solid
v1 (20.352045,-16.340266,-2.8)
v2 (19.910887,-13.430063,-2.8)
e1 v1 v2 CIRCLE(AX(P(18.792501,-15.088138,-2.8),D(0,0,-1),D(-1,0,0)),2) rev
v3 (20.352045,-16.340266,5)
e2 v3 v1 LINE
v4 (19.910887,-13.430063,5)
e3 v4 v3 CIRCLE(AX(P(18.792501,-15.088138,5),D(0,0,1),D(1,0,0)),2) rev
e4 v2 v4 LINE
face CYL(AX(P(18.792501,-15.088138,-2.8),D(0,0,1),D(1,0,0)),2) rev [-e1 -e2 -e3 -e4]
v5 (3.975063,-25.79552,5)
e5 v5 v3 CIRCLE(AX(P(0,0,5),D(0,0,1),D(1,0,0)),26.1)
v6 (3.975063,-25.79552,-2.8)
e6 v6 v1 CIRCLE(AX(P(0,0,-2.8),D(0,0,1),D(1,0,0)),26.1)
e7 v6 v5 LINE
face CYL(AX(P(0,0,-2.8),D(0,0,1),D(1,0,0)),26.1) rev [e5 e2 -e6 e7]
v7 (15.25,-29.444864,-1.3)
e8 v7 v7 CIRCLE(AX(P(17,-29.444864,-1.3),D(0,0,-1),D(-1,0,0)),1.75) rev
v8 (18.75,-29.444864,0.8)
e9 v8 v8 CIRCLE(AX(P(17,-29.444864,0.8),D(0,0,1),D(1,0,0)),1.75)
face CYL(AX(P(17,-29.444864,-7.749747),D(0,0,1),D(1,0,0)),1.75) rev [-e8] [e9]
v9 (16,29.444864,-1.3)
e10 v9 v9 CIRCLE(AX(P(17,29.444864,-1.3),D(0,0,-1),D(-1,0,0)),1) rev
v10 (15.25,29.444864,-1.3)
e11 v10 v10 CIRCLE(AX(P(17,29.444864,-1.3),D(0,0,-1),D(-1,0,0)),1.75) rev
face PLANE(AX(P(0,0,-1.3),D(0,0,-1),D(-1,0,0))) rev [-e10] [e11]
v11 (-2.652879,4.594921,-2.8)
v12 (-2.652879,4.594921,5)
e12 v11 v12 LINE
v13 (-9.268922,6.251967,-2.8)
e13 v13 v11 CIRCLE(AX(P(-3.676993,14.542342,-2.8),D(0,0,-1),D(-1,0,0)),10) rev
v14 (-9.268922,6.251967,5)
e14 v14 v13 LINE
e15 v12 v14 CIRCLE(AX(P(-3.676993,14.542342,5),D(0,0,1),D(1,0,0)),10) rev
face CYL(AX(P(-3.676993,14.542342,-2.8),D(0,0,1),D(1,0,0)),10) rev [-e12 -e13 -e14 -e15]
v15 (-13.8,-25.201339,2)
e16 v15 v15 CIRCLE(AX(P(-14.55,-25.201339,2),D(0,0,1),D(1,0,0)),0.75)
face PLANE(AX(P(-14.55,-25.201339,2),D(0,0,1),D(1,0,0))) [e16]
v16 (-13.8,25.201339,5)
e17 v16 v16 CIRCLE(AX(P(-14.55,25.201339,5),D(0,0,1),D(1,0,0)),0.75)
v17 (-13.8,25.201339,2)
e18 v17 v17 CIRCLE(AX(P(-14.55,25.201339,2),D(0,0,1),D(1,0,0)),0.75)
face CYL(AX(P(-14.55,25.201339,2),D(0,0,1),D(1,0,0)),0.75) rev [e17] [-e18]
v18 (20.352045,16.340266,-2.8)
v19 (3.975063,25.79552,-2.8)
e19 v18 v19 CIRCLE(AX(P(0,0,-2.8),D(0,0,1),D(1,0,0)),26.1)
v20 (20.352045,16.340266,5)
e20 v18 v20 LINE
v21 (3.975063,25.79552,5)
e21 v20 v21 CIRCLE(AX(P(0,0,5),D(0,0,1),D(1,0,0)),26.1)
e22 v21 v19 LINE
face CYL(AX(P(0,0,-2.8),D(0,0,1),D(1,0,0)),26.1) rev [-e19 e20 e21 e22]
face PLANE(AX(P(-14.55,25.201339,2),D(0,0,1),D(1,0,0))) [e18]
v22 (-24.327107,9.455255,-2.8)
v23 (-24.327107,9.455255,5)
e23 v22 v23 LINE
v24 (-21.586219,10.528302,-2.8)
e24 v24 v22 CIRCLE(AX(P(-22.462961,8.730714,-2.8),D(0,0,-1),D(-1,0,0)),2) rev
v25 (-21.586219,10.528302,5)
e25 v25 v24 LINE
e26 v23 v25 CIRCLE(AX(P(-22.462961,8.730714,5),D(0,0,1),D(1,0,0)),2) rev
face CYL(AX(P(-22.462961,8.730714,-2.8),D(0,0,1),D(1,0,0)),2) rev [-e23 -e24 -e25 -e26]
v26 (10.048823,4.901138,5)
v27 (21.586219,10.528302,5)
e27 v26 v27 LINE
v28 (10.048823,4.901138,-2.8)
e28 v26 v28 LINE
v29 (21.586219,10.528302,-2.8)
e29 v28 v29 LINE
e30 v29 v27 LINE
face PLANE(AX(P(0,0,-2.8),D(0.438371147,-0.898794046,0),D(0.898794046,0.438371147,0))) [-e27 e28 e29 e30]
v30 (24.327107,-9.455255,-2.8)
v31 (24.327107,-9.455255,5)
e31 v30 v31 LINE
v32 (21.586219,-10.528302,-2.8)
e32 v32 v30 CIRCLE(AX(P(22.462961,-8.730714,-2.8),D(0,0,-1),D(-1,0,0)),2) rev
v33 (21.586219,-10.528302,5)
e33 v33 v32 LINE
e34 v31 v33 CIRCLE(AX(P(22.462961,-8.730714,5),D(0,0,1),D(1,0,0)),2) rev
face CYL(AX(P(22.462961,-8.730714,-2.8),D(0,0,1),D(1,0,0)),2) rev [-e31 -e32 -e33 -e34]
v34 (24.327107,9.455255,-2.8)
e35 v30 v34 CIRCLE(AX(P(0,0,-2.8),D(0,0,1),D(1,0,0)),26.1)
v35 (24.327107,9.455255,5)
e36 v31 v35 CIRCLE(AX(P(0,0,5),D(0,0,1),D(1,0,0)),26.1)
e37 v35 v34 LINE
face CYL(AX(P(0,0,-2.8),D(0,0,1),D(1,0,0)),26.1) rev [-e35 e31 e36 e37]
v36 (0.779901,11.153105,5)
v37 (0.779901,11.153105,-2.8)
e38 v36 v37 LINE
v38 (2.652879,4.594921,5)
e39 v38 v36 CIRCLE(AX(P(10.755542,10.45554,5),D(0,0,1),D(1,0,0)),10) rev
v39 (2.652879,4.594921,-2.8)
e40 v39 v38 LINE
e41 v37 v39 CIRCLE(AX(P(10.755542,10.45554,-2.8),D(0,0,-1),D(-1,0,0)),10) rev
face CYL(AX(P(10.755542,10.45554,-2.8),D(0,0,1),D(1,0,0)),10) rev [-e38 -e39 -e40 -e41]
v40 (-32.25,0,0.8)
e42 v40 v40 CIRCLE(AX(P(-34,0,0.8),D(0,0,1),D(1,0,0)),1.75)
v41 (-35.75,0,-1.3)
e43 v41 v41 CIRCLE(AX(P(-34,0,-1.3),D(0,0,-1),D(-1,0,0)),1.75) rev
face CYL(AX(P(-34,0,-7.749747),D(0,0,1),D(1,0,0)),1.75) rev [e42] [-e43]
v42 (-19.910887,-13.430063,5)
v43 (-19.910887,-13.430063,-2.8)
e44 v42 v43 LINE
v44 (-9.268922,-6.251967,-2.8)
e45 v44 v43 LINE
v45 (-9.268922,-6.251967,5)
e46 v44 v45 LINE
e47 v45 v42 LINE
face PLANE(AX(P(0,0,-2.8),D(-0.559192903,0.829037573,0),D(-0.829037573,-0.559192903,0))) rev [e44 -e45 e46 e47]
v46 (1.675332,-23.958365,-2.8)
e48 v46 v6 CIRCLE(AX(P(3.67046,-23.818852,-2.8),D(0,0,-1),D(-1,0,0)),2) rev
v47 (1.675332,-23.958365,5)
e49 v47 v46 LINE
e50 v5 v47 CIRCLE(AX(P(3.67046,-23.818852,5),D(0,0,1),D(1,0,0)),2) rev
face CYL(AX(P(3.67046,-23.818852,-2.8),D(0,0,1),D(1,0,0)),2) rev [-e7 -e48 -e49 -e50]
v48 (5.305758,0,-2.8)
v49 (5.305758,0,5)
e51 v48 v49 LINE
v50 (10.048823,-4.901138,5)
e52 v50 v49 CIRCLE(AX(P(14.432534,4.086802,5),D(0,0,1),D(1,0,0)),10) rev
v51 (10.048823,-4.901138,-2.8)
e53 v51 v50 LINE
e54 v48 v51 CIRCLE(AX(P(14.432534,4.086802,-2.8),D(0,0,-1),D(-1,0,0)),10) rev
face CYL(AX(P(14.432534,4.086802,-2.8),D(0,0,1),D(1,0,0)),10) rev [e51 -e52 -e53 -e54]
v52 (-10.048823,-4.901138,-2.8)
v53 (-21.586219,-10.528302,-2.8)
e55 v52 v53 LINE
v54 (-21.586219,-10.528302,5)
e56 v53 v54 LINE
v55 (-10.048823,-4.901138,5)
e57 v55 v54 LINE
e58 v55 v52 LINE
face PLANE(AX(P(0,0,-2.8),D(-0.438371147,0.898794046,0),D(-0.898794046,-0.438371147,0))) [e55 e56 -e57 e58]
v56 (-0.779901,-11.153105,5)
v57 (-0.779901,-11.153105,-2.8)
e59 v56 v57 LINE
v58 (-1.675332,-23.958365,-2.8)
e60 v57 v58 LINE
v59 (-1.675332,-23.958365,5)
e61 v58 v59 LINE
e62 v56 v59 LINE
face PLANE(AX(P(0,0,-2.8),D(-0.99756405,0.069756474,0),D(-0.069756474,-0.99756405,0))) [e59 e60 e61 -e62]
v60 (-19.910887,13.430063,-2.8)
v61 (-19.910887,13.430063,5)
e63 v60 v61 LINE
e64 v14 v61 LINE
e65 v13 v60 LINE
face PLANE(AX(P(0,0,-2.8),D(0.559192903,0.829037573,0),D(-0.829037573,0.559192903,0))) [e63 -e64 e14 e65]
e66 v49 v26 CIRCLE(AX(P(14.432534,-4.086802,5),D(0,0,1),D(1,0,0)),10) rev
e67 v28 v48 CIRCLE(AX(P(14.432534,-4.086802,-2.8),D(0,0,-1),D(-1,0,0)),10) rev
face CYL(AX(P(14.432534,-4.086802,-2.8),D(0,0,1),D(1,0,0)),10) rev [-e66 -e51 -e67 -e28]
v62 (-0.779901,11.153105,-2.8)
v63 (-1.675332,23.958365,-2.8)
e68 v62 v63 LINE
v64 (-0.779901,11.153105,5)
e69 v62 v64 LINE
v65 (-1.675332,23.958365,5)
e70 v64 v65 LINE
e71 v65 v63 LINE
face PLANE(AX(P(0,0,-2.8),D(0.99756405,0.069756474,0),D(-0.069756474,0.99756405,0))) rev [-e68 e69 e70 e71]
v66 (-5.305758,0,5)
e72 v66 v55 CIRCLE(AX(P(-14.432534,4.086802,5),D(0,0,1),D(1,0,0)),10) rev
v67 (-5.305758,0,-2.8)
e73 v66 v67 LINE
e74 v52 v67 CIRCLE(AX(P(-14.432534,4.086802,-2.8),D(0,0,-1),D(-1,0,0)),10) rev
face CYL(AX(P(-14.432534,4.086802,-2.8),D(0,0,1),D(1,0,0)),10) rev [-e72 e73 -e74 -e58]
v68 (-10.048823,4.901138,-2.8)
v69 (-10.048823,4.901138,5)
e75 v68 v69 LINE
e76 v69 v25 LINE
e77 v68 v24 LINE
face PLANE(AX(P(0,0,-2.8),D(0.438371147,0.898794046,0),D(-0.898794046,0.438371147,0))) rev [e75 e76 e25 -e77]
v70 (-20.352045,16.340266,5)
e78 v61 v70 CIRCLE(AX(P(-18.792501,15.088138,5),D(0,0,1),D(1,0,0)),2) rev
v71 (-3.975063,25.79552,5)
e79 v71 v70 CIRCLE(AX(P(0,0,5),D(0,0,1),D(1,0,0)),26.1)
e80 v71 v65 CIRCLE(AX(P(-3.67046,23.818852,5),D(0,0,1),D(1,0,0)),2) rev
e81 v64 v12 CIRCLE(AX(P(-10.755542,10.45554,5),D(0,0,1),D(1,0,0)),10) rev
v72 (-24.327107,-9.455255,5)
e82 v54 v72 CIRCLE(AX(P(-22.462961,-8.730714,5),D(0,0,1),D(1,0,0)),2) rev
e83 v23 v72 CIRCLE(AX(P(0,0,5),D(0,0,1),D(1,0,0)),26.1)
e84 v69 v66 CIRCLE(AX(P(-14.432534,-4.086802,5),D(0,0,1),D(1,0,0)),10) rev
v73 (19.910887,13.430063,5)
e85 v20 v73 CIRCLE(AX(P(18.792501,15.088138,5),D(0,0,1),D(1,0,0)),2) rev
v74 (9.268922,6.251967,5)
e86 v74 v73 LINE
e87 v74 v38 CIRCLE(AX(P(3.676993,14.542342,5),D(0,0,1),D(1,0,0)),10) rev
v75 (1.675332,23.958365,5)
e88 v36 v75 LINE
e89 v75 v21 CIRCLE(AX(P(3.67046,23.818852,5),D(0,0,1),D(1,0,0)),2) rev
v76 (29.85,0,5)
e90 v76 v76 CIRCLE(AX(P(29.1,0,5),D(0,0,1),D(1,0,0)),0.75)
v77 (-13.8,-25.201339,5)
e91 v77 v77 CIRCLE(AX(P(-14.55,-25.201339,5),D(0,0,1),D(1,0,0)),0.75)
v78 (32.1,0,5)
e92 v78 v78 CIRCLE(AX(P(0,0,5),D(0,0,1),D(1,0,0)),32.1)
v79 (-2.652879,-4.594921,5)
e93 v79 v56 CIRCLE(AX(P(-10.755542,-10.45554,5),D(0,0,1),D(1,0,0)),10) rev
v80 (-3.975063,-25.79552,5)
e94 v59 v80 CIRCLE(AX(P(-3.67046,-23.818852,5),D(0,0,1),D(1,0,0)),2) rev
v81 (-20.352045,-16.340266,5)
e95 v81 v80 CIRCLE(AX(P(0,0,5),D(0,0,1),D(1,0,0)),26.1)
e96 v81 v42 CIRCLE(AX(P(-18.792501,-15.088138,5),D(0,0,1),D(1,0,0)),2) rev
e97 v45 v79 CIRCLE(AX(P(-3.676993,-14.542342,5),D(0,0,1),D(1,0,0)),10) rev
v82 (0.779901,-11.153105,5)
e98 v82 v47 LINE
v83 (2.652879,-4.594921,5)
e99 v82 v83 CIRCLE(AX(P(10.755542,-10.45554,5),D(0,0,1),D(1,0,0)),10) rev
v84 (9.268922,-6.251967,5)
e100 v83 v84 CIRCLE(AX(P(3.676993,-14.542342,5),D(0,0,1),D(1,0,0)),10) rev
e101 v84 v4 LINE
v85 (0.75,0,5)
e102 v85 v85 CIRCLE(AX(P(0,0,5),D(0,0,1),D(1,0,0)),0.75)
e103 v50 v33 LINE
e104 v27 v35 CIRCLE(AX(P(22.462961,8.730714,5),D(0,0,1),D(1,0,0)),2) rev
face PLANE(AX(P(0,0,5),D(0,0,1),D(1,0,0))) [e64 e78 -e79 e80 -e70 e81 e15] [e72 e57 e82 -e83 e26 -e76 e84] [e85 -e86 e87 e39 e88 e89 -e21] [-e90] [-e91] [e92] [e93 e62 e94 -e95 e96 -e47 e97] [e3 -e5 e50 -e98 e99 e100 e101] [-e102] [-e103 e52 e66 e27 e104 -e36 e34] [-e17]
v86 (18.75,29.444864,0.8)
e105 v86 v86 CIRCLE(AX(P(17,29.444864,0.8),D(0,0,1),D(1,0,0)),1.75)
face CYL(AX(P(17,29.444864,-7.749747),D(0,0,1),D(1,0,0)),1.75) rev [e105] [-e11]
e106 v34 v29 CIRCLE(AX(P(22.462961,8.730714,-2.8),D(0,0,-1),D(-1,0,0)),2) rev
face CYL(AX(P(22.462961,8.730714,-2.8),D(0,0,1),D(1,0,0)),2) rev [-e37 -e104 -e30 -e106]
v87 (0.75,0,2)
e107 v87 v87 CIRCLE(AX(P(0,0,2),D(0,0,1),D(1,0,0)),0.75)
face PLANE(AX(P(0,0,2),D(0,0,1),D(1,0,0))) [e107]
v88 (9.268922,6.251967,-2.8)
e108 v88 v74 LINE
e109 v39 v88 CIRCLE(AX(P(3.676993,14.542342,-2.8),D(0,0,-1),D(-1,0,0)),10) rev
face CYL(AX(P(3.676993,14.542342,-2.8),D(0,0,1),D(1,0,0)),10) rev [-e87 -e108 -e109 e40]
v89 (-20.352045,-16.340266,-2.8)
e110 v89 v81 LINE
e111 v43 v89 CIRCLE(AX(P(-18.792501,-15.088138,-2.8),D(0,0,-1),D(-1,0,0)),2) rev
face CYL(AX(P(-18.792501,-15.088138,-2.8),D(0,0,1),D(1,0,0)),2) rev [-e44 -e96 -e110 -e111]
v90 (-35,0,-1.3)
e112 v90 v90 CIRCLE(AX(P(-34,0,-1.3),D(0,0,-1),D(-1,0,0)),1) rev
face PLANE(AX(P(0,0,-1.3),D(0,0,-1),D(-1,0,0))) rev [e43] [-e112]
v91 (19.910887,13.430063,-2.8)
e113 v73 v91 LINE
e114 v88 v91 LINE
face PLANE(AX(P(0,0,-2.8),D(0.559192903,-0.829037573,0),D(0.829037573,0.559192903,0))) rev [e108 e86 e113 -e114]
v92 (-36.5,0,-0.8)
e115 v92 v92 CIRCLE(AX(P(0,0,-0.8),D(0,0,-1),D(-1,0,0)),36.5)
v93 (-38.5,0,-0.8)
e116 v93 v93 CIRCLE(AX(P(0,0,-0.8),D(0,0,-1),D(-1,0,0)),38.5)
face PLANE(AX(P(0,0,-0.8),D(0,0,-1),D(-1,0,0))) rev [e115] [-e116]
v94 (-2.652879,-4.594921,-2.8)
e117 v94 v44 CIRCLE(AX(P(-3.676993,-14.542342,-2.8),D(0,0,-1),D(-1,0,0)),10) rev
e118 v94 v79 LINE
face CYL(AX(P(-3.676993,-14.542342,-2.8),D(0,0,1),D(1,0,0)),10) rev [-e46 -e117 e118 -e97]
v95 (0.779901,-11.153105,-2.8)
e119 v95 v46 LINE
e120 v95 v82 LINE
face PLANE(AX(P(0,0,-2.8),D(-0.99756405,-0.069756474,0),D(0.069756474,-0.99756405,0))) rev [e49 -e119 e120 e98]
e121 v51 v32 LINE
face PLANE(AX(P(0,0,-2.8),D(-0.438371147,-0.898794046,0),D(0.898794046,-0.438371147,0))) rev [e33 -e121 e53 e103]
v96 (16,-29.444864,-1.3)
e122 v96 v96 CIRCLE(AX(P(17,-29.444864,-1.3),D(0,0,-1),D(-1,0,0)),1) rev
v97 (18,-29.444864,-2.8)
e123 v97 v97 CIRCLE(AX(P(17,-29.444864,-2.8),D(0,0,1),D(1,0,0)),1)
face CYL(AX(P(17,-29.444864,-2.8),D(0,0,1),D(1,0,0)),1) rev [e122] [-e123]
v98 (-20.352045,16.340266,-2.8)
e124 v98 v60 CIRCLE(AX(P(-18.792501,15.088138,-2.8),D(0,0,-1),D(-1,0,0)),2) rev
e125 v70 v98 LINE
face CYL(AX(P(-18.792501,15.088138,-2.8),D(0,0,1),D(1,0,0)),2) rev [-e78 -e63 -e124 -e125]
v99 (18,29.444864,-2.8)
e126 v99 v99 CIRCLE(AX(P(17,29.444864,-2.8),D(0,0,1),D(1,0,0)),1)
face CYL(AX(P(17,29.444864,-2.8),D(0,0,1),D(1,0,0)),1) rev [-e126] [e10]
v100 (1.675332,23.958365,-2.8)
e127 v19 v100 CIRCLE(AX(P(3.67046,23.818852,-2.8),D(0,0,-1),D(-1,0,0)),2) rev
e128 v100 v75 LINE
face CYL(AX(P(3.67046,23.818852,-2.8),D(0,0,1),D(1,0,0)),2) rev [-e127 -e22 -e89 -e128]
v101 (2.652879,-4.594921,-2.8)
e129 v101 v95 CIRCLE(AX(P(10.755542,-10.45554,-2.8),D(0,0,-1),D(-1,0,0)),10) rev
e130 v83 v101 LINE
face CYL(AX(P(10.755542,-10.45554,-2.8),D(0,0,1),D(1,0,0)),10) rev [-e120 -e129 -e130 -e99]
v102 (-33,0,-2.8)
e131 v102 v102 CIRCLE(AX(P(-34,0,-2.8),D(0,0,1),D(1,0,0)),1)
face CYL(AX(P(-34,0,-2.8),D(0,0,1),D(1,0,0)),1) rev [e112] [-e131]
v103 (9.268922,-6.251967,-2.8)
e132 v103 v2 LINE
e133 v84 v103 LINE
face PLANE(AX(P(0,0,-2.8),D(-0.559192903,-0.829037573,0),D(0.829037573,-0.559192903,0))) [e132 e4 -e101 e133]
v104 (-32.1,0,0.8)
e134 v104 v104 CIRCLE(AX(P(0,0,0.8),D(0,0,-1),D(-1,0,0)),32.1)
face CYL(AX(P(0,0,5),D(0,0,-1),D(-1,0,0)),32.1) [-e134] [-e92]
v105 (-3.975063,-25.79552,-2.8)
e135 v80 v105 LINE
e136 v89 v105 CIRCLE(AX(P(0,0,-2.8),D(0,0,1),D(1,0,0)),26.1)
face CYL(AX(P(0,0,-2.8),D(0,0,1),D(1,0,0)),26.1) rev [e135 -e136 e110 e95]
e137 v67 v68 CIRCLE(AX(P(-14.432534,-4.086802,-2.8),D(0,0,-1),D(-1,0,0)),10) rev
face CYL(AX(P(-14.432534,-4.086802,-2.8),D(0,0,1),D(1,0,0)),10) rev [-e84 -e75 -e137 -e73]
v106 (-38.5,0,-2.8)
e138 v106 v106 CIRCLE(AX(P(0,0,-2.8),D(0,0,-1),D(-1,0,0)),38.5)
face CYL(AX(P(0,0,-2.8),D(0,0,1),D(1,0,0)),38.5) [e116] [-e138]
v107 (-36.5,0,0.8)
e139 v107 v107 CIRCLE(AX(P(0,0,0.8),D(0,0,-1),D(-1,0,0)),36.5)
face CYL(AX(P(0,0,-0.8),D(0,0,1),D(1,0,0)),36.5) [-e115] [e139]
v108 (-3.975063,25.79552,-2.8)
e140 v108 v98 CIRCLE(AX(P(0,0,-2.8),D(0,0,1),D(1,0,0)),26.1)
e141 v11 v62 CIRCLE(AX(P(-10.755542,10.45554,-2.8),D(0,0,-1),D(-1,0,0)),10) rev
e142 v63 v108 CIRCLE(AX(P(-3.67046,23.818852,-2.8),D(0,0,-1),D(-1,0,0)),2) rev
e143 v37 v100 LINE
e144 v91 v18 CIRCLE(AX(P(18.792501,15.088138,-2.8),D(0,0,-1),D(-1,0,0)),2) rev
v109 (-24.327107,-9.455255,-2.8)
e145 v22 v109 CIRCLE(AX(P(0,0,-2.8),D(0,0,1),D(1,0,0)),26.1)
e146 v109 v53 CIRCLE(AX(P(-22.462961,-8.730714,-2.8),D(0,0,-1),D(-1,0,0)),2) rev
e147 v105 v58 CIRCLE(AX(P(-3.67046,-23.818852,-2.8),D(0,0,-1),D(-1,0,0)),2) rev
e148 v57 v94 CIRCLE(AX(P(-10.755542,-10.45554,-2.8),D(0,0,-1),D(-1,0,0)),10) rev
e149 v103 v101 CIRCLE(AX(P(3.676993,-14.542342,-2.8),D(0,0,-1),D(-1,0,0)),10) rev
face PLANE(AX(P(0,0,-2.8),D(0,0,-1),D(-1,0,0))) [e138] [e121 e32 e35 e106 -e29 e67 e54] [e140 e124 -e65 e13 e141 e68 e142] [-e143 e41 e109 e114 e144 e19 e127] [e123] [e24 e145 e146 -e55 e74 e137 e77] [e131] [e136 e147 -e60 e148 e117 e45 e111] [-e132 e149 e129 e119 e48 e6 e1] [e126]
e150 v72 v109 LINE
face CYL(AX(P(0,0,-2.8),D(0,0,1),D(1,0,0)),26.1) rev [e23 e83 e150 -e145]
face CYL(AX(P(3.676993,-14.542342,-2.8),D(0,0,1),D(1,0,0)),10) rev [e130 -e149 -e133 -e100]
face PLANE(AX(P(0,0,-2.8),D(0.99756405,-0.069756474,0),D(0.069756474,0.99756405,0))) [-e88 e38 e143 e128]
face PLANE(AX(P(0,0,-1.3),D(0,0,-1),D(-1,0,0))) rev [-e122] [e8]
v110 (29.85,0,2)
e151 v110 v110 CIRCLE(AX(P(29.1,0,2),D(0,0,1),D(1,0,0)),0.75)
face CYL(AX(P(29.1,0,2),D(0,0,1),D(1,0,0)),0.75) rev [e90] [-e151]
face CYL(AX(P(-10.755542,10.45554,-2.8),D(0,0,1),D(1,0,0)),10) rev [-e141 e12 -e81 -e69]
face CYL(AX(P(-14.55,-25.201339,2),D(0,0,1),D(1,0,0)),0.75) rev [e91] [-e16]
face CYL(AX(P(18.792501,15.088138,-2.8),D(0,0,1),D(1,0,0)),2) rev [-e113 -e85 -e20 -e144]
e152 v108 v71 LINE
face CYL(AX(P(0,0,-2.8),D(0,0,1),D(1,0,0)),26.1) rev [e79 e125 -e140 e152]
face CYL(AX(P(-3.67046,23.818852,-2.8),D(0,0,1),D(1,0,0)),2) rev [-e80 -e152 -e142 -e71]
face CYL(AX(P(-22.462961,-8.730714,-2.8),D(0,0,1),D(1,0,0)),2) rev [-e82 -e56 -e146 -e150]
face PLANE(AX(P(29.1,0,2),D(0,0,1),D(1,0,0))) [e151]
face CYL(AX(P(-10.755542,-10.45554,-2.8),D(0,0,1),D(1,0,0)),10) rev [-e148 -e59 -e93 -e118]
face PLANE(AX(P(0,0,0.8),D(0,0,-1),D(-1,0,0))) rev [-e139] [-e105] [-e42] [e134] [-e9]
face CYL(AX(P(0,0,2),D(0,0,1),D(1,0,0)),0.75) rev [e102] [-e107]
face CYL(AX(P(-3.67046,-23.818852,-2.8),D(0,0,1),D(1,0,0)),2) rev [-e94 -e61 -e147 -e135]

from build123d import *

# Parameters (mm, degrees)
SKETCH_1_R                       = 32.1
EXTRUDE_1_DEPTH                  = 5
EXTRUDE_START                    = 0.8
SKETCH_2_R                       = 36.5
EXTRUDE_2_DEPTH                  = 1.6
SKETCH_3_R                       = 38.5
EXTRUDE_3_DEPTH                  = 2
SKETCH_4_R                       = 26.1
CUT_EXTRUDE_1_DEPTH              = 56.003090822
SKETCH_4_3_R                     = 5
EXTRUDE_4_DEPTH                  = 7.8
EXTRUDE_5_DEPTH                  = 7.8
FILLET_6_R                       = 2
PATTERN_CIRCULAR_2_COUNT         = 6
FILLET_6_OF_PATTERN_CIRCULAR_2_R = 2
FILLET_7_R                       = 10
SKETCH_6_R                       = 0.75
CUT_EXTRUDE_2_DEPTH              = 3
SKETCH_8_R                       = 1
CUT_EXTRUDE_4_DEPTH              = 55.608973622
SKETCH_8_3_R                     = 1.75
CUT_EXTRUDE_5_DEPTH              = 2.1


with BuildPart() as part:
    # 草图1 → 凸台-拉伸1 (new body)
    with BuildSketch(Plane.XY):
        Circle(SKETCH_1_R)
    extrude(amount=EXTRUDE_1_DEPTH)

    # 草图2 → 凸台-拉伸2 (add)
    with BuildSketch(Plane(origin=(0, 0, 0), x_dir=(-1, 0, 0), z_dir=(0, 0, -1)).offset(EXTRUDE_START)):
        Circle(SKETCH_2_R)
    extrude(amount=-EXTRUDE_2_DEPTH)

    # 草图3 → 凸台-拉伸3 (add)
    with BuildSketch(Plane(origin=(0, 0, -0.8), x_dir=(-1, 0, 0), z_dir=(0, 0, -1))):
        Circle(SKETCH_3_R)
    extrude(amount=EXTRUDE_3_DEPTH)

    # 草图4 → 切除-拉伸1 (cut, through all)
    with BuildSketch(Plane.XY.offset(5)):
        Circle(SKETCH_4_R)
    extrude(amount=-CUT_EXTRUDE_1_DEPTH, mode=Mode.SUBTRACT)



with BuildPart() as body_2:
    # 草图4<3> → 凸台-拉伸4 (new, through all)
    with BuildSketch(Plane.XY.offset(5)):
        Circle(SKETCH_4_3_R)
    extrude(amount=-EXTRUDE_4_DEPTH)


with BuildPart() as part_1:
    add(part.part)

    add(body_2.part)  # 凸台-拉伸5 merges body 2
    # 草图4<4> → 凸台-拉伸5 (add, through all)
    with BuildSketch(Plane.XY.offset(5)):
        with BuildLine():
            Line((-1.820643965, 26.036421712), (-0.348782369, 4.987820251))
            ThreePointArc((-0.348782369, 4.987820251), (0, 5), (0.348782369, 4.987820251))
            Line((0.348782369, 4.987820251), (1.820643965, 26.036421712))
            ThreePointArc((1.820643965, 26.036421712), (0, 26.1), (-1.820643965, 26.036421712))
        make_face()
    extrude_5 = extrude(amount=-EXTRUDE_5_DEPTH)

    # 圆角6
    fillet_6_edges = [part_1.edges().sort_by_distance(p)[0] for p in [
        (1.820643965, 26.036421712, 1.1),
        (-1.820643965, 26.036421712, 1.1),
    ]]
    fillet(fillet_6_edges, radius=FILLET_6_R)

    # 阵列(圆周)2: 凸台-拉伸5 ×6 about axis
    pattern_circular_2_axis = Axis((0, 0, 0), (0, 0, 1))
    for i in range(1, PATTERN_CIRCULAR_2_COUNT):
        add(extrude_5.rotate(pattern_circular_2_axis, i * 360 / PATTERN_CIRCULAR_2_COUNT))

    # 圆角6 of 阵列(圆周)2
    fillet_6_of_pattern_circular_2_edges = [part_1.edges().sort_by_distance(p)[0] for p in [
        (-21.637880644, 14.594934781, 1.1),
        (-23.458524608, 11.441486931, 1.1),
        (-23.458524608, -11.441486931, 1.1),
        (-21.637880644, -14.594934781, 1.1),
        (-1.820643965, -26.036421712, 1.1),
        (1.820643965, -26.036421712, 1.1),
        (21.637880644, -14.594934781, 1.1),
        (23.458524608, -11.441486931, 1.1),
        (23.458524608, 11.441486931, 1.1),
        (21.637880644, 14.594934781, 1.1),
    ]]
    fillet(fillet_6_of_pattern_circular_2_edges, radius=FILLET_6_OF_PATTERN_CIRCULAR_2_R)

    # 圆角7
    # the kernel refuses this fillet: 10 mm, written as the material it adds along each edge
    with BuildSketch(Plane(origin=(-4.493970231, -2.191855734, 5), x_dir=(-0.8987940462991628, -0.4383711467890857, 0), z_dir=(0, 0, -1)), Plane(origin=(-0.348782369, -4.987820251, 5), x_dir=(-0.06975647374411581, -0.9975640502598249, 0), z_dir=(0, 0, -1)), Plane(origin=(4.145187863, -2.795964517, 5), x_dir=(0.8290375725550467, -0.5591929034707394, 0), z_dir=(0, 0, -1)), Plane(origin=(4.493970231, 2.191855734, 5), x_dir=(0.8987940462991627, 0.43837114678908606, 0), z_dir=(0, 0, -1)), Plane(origin=(0.348782369, 4.987820251, 5), x_dir=(0.0697564737441158, 0.9975640502598249, 0), z_dir=(0, 0, -1)), Plane(origin=(-4.145187863, 2.795964517, 5), x_dir=(-0.8290375725550471, 0.5591929034707388, 0), z_dir=(0, 0, -1))) as fillet_7_piece_1:
        with BuildLine():
            CenterArc((6.180339887, 10), FILLET_7_R, 221.810314896, 48.189685104)
            ThreePointArc((-1.273220038, 3.333333333), (-0.329138205, 1.784110449), (0, 0))
            Line((0, 0), (6.180339887, 0))
        make_face()
    extrude(amount=7.8)
    with BuildSketch(Plane(origin=(-4.145187863, -2.795964517, 5), x_dir=(-0.8290375725550488, -0.5591929034707364, 0), z_dir=(0, 0, -1)), Plane(origin=(0.348782369, -4.987820251, 5), x_dir=(0.06975647374411298, -0.9975640502598251, 0), z_dir=(0, 0, -1)), Plane(origin=(4.493970231, -2.191855734, 5), x_dir=(0.8987940462991613, -0.4383711467890891, 0), z_dir=(0, 0, -1)), Plane(origin=(4.145187863, 2.795964517, 5), x_dir=(0.8290375725550484, 0.5591929034707368, 0), z_dir=(0, 0, -1)), Plane(origin=(-0.348782369, 4.987820251, 5), x_dir=(-0.0697564737441132, 0.9975640502598251, 0), z_dir=(0, 0, -1)), Plane(origin=(-4.493970231, 2.191855734, 5), x_dir=(-0.8987940462991615, 0.43837114678908873, 0), z_dir=(0, 0, -1))) as fillet_7_piece_2:
        with BuildLine():
            CenterArc((6.180339887, -10), FILLET_7_R, 90, 48.189685104)
            ThreePointArc((-1.273220038, -3.333333333), (-0.329138205, -1.784110449), (0, 0))
            Line((0, 0), (6.180339887, 0))
        make_face()
    extrude(amount=7.8)

    # 草图6 → 切除-拉伸2 (cut)
    with BuildSketch(Plane.XY.offset(5)):
        Circle(SKETCH_6_R)
        with Locations((-14.55, 25.20133925)):
            Circle(SKETCH_6_R)
        with Locations((29.1, 0)):
            Circle(SKETCH_6_R)
        with Locations((-14.55, -25.20133925)):
            Circle(SKETCH_6_R)
    extrude(amount=-CUT_EXTRUDE_2_DEPTH, mode=Mode.SUBTRACT)

    # 草图8 → 切除-拉伸4 (cut, through all)
    with BuildSketch(Plane.XY.offset(0.8)):
        with Locations((17, 29.444863729)):
            Circle(SKETCH_8_R)
        with Locations((-34, 0)):
            Circle(SKETCH_8_R)
        with Locations((17, -29.444863729)):
            Circle(SKETCH_8_R)
    extrude(amount=-CUT_EXTRUDE_4_DEPTH, mode=Mode.SUBTRACT)

    # 草图8<3> → 切除-拉伸5 (cut)
    with BuildSketch(Plane.XY.offset(0.8)):
        with Locations((-34, 0)):
            Circle(SKETCH_8_3_R)
        with Locations((17, 29.444863729)):
            Circle(SKETCH_8_3_R)
        with Locations((17, -29.444863729)):
            Circle(SKETCH_8_3_R)
    extrude(amount=-CUT_EXTRUDE_5_DEPTH, mode=Mode.SUBTRACT)


solid = part_1.part
